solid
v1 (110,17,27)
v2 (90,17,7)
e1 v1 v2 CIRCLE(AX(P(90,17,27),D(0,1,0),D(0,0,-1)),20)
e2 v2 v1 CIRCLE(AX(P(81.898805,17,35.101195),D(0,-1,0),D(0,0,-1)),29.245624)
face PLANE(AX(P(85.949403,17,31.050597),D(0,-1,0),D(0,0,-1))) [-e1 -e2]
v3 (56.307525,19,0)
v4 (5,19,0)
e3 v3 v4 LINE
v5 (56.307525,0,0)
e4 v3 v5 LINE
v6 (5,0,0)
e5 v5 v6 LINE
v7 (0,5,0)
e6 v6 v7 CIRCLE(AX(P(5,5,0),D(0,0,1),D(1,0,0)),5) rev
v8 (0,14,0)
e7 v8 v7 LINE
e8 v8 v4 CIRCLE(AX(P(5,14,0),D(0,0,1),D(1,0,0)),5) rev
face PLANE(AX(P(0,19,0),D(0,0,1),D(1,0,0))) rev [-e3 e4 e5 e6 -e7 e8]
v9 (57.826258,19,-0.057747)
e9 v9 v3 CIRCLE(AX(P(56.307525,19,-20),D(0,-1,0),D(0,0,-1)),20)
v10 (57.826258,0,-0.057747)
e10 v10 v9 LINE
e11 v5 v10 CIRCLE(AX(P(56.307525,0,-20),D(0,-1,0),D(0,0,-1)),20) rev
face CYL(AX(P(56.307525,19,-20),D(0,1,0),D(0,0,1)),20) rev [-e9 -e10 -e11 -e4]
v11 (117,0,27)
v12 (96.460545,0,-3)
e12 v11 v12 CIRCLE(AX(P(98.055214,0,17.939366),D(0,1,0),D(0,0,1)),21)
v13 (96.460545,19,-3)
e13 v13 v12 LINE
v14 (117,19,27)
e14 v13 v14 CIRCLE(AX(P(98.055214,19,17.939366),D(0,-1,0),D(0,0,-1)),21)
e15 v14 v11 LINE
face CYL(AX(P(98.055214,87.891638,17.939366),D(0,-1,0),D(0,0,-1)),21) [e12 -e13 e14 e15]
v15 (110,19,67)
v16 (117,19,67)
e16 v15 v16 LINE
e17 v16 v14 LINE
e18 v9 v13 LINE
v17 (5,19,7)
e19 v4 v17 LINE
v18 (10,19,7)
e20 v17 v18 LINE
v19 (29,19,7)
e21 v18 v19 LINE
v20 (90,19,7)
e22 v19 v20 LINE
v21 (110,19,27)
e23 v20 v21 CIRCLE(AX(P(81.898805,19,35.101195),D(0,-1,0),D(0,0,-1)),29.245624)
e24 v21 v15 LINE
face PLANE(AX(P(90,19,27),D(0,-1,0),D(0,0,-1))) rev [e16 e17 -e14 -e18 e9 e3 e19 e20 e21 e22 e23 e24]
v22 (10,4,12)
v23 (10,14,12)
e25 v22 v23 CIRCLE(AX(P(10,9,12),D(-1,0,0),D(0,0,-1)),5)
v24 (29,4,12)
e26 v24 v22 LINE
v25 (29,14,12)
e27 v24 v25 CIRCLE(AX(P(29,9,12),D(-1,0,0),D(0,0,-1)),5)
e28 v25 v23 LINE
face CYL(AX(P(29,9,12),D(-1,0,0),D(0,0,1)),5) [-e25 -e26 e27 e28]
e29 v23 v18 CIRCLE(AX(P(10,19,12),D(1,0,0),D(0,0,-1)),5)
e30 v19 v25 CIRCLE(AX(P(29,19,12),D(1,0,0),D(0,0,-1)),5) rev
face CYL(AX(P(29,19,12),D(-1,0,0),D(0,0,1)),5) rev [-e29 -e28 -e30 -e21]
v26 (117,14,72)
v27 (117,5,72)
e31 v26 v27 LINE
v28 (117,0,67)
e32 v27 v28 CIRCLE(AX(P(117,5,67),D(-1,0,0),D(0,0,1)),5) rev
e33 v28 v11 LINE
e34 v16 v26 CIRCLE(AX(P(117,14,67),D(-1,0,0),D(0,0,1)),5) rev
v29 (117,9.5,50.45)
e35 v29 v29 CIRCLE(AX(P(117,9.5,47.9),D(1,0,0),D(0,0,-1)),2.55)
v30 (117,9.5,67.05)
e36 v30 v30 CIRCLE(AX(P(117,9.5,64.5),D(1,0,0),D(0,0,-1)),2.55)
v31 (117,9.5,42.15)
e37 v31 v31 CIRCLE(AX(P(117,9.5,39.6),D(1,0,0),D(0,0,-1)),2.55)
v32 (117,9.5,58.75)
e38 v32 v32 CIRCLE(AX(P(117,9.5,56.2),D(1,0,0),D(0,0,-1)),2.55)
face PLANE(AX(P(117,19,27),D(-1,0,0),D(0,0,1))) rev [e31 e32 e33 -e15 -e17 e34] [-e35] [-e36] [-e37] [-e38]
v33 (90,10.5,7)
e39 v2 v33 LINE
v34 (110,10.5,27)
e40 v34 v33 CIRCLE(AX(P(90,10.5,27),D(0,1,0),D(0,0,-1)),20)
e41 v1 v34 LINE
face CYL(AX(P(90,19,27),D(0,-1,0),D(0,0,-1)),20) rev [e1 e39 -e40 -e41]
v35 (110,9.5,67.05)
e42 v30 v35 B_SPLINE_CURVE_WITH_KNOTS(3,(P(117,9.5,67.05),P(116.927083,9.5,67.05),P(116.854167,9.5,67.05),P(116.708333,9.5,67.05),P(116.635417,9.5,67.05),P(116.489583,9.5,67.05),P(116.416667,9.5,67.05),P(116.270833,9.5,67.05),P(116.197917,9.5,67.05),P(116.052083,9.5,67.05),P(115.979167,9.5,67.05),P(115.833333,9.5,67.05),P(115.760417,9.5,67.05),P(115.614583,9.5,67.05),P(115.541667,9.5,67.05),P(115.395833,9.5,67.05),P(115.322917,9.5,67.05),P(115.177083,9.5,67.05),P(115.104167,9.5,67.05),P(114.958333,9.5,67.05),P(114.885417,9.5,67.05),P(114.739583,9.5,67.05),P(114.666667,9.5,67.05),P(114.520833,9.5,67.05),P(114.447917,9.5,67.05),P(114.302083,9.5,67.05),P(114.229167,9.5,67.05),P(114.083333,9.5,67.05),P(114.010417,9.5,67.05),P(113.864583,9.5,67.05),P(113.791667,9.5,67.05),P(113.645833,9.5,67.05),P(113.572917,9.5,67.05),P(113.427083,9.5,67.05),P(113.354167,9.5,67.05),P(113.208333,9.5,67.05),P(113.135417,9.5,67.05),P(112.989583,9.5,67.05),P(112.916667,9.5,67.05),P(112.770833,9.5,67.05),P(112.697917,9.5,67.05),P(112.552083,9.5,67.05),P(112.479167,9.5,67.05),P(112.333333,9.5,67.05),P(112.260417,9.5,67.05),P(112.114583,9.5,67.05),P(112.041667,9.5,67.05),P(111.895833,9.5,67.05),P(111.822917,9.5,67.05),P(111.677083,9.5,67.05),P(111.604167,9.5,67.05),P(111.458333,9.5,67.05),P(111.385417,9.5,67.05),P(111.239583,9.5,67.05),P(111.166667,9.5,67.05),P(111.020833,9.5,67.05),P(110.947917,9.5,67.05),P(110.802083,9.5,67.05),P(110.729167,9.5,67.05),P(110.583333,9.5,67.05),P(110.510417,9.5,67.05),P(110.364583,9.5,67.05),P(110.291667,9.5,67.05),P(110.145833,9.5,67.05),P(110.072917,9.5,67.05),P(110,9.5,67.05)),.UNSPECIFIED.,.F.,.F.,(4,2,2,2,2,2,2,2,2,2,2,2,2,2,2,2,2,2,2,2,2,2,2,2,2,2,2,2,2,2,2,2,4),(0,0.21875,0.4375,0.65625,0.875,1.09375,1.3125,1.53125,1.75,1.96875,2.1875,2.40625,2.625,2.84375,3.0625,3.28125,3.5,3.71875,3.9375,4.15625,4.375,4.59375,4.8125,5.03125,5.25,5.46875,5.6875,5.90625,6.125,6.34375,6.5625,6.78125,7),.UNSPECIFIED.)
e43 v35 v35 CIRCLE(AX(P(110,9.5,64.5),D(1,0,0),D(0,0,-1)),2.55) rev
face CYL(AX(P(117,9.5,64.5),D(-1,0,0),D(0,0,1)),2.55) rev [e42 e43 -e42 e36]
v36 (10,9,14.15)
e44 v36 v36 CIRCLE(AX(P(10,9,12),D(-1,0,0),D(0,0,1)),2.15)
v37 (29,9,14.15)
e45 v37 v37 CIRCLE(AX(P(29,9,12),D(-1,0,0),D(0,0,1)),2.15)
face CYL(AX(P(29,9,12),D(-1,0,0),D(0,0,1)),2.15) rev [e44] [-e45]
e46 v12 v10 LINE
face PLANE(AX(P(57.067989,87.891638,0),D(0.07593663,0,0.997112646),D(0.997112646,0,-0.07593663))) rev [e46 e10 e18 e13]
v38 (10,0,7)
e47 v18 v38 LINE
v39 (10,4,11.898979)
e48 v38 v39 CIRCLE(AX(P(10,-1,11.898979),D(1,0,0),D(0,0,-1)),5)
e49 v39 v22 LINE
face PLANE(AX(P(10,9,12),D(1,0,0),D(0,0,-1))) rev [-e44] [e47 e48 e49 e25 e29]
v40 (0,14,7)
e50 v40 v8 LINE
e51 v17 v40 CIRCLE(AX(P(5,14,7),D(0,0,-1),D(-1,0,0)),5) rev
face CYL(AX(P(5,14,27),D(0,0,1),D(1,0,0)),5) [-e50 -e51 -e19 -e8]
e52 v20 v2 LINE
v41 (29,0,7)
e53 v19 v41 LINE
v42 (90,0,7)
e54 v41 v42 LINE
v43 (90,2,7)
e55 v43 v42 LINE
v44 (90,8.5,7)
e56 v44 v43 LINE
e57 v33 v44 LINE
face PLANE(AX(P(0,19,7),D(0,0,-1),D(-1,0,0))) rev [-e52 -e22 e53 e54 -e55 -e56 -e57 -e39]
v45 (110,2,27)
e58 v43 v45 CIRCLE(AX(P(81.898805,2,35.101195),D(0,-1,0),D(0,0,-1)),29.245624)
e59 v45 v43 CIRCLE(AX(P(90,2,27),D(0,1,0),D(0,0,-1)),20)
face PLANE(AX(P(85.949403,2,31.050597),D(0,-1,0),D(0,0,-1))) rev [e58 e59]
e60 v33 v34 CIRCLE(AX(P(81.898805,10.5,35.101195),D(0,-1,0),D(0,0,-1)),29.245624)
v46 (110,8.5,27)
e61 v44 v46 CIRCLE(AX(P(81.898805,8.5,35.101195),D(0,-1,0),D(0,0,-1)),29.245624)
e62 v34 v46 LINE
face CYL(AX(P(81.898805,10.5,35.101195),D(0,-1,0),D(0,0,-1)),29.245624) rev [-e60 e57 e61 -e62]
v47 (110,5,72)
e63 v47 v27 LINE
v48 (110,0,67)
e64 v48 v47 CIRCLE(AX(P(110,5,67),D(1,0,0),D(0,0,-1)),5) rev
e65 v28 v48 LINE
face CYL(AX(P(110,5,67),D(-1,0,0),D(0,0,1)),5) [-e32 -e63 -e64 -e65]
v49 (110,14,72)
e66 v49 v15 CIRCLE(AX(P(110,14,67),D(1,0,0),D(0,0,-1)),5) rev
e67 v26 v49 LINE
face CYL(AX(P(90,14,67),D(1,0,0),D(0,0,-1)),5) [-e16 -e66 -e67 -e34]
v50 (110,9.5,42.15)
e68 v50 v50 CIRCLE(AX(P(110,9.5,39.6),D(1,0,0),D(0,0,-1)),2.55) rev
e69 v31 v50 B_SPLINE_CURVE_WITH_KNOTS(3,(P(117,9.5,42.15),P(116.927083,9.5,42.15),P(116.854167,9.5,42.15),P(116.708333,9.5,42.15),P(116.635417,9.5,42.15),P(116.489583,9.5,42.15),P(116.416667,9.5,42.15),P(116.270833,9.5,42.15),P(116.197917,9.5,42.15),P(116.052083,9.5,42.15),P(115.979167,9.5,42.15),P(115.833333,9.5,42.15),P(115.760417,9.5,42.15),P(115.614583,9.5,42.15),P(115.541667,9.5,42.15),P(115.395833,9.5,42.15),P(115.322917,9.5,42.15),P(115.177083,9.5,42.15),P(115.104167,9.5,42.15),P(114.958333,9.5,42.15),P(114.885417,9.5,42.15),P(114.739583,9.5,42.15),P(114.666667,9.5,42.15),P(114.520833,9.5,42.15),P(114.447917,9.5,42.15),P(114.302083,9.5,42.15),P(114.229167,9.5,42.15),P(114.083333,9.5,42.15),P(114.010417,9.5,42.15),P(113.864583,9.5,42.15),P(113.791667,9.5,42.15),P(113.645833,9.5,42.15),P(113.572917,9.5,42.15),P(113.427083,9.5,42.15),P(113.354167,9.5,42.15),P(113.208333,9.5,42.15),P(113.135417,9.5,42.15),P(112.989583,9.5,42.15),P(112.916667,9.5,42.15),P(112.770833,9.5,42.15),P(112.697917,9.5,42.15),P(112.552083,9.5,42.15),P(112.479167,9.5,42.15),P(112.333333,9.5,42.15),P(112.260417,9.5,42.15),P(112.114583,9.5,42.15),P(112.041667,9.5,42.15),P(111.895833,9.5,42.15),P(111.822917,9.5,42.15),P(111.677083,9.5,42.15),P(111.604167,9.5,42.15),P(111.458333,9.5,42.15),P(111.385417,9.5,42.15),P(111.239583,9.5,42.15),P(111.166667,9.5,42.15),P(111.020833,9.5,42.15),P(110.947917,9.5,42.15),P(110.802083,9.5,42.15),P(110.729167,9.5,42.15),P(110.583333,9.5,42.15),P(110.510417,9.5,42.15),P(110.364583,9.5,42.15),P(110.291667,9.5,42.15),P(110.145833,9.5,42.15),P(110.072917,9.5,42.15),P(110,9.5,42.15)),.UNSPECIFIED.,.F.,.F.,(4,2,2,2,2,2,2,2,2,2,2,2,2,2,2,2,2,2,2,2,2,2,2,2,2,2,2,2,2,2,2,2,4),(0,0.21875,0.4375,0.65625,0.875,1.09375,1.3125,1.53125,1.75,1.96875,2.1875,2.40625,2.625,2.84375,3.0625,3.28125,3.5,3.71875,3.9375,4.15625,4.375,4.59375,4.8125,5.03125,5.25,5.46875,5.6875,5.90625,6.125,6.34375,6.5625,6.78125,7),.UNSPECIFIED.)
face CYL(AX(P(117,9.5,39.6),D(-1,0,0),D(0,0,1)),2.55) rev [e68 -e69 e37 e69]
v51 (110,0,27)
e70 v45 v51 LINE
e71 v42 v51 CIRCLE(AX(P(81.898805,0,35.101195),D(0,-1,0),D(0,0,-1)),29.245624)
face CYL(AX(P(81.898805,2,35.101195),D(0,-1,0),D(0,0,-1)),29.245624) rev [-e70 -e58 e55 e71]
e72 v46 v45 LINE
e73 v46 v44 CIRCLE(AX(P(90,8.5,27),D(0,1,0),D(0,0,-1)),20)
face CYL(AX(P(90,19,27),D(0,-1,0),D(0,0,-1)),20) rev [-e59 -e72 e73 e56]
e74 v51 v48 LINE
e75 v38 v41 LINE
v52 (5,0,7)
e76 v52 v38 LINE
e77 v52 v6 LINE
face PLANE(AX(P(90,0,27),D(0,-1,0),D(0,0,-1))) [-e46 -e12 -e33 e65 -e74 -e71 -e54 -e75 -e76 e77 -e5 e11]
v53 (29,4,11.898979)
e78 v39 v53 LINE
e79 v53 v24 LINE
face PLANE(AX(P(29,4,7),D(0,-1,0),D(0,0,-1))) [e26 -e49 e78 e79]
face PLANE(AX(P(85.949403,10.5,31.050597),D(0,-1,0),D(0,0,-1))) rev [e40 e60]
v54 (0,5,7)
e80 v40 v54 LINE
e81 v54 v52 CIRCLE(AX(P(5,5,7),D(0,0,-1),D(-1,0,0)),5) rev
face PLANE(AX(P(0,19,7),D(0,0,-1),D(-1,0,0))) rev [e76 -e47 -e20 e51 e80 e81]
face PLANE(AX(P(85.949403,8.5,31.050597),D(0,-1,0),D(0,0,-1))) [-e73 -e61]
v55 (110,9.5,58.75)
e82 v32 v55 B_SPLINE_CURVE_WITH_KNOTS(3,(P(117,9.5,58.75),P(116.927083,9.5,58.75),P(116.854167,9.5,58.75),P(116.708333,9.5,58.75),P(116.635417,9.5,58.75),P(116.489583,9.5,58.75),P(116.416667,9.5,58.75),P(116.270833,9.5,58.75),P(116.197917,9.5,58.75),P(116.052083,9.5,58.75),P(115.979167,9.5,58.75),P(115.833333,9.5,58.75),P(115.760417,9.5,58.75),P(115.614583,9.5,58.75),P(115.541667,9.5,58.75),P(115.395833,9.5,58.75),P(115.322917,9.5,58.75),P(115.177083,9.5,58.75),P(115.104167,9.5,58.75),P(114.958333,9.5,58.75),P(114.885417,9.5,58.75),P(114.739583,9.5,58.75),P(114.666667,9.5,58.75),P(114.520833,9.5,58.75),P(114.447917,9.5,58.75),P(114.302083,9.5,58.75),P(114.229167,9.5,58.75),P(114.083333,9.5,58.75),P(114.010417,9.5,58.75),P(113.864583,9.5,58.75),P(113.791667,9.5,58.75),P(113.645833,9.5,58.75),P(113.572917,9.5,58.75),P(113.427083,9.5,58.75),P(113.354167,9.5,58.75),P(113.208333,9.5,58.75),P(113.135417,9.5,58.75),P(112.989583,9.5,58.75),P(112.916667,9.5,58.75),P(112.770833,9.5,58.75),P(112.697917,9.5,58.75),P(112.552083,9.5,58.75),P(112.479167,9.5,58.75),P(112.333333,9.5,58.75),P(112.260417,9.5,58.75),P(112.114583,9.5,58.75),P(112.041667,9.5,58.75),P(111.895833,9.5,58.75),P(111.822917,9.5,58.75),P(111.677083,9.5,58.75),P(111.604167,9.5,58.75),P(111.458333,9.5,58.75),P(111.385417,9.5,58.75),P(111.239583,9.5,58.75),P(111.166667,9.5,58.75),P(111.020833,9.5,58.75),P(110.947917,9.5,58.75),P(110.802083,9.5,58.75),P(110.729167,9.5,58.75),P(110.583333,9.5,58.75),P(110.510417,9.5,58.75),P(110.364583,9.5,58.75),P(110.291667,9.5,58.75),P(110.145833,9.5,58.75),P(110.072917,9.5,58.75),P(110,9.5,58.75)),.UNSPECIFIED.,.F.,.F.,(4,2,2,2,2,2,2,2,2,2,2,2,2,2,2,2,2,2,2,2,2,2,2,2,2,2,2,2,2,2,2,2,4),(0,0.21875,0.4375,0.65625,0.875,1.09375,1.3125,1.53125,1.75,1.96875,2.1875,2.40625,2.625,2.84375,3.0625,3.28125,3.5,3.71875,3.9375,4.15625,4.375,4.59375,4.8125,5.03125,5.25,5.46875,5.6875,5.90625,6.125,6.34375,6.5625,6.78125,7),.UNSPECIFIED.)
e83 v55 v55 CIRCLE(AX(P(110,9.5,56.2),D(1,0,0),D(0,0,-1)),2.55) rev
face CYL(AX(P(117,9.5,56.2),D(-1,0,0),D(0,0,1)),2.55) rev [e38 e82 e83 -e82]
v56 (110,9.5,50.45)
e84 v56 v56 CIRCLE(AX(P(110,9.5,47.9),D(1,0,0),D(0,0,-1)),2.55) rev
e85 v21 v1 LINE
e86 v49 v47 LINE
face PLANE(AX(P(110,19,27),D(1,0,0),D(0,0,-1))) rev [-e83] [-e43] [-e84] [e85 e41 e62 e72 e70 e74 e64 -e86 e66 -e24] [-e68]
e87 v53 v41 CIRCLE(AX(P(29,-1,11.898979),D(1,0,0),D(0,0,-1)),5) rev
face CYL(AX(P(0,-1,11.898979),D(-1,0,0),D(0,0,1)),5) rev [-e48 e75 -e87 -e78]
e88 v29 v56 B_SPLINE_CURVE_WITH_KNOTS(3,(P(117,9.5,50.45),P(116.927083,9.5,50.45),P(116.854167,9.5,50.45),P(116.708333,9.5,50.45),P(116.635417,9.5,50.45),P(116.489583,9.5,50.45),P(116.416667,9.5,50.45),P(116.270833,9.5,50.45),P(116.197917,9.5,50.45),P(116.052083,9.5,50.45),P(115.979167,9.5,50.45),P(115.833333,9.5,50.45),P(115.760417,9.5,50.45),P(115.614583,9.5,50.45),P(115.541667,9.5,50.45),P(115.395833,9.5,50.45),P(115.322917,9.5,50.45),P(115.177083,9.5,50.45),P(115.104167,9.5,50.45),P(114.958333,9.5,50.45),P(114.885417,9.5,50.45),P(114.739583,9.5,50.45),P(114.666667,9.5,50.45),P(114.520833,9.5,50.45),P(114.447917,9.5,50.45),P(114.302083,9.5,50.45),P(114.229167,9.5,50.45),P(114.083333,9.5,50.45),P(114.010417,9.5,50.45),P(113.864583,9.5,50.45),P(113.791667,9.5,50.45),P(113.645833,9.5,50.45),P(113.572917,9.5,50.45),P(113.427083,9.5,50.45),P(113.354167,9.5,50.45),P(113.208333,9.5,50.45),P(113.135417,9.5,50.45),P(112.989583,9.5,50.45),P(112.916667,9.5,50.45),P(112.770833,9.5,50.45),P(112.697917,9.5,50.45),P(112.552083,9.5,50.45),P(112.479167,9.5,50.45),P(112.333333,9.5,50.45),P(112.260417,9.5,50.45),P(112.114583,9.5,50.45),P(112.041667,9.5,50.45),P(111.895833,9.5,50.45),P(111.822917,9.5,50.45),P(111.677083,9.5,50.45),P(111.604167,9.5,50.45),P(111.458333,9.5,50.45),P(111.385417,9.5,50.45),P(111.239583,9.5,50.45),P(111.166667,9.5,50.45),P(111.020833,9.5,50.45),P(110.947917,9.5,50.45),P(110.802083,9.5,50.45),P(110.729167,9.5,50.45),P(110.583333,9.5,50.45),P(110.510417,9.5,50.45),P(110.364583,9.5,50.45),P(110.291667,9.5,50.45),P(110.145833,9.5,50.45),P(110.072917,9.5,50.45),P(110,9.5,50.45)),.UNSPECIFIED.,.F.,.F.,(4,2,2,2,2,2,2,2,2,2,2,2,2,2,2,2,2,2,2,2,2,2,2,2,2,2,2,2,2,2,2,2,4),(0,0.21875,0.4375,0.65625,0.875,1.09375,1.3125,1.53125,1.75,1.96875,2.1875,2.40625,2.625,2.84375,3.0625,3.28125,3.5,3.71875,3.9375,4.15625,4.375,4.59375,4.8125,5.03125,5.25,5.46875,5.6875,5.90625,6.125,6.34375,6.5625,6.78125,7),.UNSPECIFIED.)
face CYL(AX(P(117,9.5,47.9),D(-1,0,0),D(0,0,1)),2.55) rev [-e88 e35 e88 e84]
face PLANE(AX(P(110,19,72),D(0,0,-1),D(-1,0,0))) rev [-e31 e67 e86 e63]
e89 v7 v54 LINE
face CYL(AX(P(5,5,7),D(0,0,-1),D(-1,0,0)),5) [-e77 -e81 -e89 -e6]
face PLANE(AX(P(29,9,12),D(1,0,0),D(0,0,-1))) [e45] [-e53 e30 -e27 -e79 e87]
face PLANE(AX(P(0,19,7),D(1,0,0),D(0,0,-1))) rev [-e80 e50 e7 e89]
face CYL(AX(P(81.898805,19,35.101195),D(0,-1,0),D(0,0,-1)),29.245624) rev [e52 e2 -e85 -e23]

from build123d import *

# Parameters (mm, degrees)
BOSS_EXTRUDE1_DEPTH = 19
SKETCH4_R           = 2.55
CUT_EXTRUDE1_DEPTH  = 139.686697271
LPATTERN1_COUNT     = 4
LPATTERN1_PITCH     = 8.3
FILLET2_R           = 5
BOSS_EXTRUDE4_DEPTH = 19
BOSS_EXTRUDE5_DEPTH = 2
LPATTERN3_COUNT     = 3
LPATTERN3_PITCH     = 8.5
FILLET4_R           = 20
SKETCH9_R           = 2.15
BOSS_EXTRUDE6_DEPTH = 19
FILLET5_R           = 5


with BuildPart() as part:
    # Sketch1 → Boss-Extrude1 (new body)
    with BuildSketch(Plane(origin=(0, 0, 0), x_dir=(1, 0, 0), z_dir=(0, 1, 0))):
        with BuildLine():
            Line((0, 0), (90, 0))
            ThreePointArc((90, 0), (109.091883092, -7.908116908), (117, -27))
            Line((117, -27), (117, -72))
            Line((117, -72), (110, -72))
            Line((110, -72), (110, -27))
            ThreePointArc((110, -27), (104.142135624, -12.857864376), (90, -7))
            Line((90, -7), (0, -7))
            Line((0, -7), (0, 0))
        make_face()
    extrude(amount=BOSS_EXTRUDE1_DEPTH)

    # Sketch4 → Cut-Extrude1 (cut, through all)
    with BuildSketch(Plane(origin=(0, 0, 0), x_dir=(0, 0, -1), z_dir=(1, 0, 0))):
        with Locations(Location((-64.5, 9.5, 0), (0, 0, 180))):
            Circle(SKETCH4_R)
    cut_extrude1 = extrude(amount=CUT_EXTRUDE1_DEPTH, mode=Mode.SUBTRACT)

    # LPattern1: Cut-Extrude1 ×4
    with Locations(*[(0, 0, -i * LPATTERN1_PITCH) for i in range(1, LPATTERN1_COUNT)]):
        add(cut_extrude1, mode=Mode.SUBTRACT)

    # Fillet2
    fillet2_edges = [part.edges().sort_by_distance(p)[0] for p in [
        (0, 0, 3.5),
        (113.5, 19, 72),
        (0, 19, 3.5),
        (113.5, 0, 72),
    ]]
    fillet(fillet2_edges, radius=FILLET2_R)

    # Sketch6 → Boss-Extrude4 (add)
    with BuildSketch(Plane(origin=(0, 0, 0), x_dir=(1, 0, 0), z_dir=(0, 1, 0))):
        with BuildLine():
            Line((57.067989457, 0), (96.460545107, 3))
            ThreePointArc((96.460545107, 3), (115.383129249, -6.075834674), (117, -27))
            ThreePointArc((117, -27), (109.091883092, -7.908116908), (90, 0))
            Line((90, 0), (57.067989457, 0))
        make_face()
    extrude(amount=BOSS_EXTRUDE4_DEPTH)

    # Sketch8 → Boss-Extrude5 (add)
    with BuildSketch(Plane(origin=(0, 0, 0), x_dir=(1, 0, 0), z_dir=(0, 1, 0))):
        with BuildLine():
            ThreePointArc((90, -7), (102.578584062, -14.421415938), (110, -27))
            ThreePointArc((110, -27), (104.142135624, -12.857864376), (90, -7))
        make_face()
    boss_extrude5 = extrude(amount=BOSS_EXTRUDE5_DEPTH)

    # LPattern3: Boss-Extrude5 ×3
    with Locations(*[(0, i * LPATTERN3_PITCH, 0) for i in range(1, LPATTERN3_COUNT)]):
        add(boss_extrude5)

    # Fillet4
    # the kernel refuses this fillet: 20 mm, written as the material it adds along each edge
    with BuildSketch(Plane(origin=(57.067989457, 0, 0), x_dir=(-1, 0, 0), z_dir=(0, 1, 0))) as fillet4_piece_1:
        with BuildLine():
            CenterArc((FILLET4_R * 0.0380232084134, -FILLET4_R), FILLET4_R, 90, 4.355040752)
            Line((-FILLET4_R * 0.0379134219382, -FILLET4_R * 0.00288735432207), (0, 0))
            Line((0, 0), (FILLET4_R * 0.0380232084134, 0))
        make_face()
    extrude(amount=19)

    # Sketch9 → Boss-Extrude6 (add)
    with BuildSketch(Plane.ZY.offset(-10)):
        with BuildLine():
            Line((7, 14), (12, 14))
            ThreePointArc((12, 14), (17, 9), (12, 4))
            Line((12, 4), (7, 4))
            Line((7, 4), (7, 14))
        make_face()
        with Locations((12, 9)):
            Circle(SKETCH9_R, mode=Mode.SUBTRACT)
    extrude(amount=-BOSS_EXTRUDE6_DEPTH)

    # Fillet5
    # the kernel refuses this fillet: 5 mm, written as the material it adds along each edge
    with BuildSketch(Plane(origin=(10, 4, 7), x_dir=(0, -1.0, 1.5822898546952626e-12), z_dir=(1, 0, 0))) as fillet5_piece_1:
        with BuildLine():
            CenterArc((5, -4.898979486), FILLET5_R, 101.536959033, 78.463040967)
            Line((0, -4.898979486), (0, 0))
            Line((0, 0), (4, 0))
        make_face()
    extrude(amount=19)
    with BuildSketch(Plane(origin=(10, 14, 7), x_dir=(0, 1, 0), z_dir=(1, 0, 0))) as fillet5_piece_2:
        with BuildLine():
            CenterArc((FILLET5_R, FILLET5_R), FILLET5_R, 180, 90)
            Line((0, FILLET5_R), (0, 0))
            Line((0, 0), (FILLET5_R, 0))
        make_face()
    extrude(amount=19)


solid = part.part
